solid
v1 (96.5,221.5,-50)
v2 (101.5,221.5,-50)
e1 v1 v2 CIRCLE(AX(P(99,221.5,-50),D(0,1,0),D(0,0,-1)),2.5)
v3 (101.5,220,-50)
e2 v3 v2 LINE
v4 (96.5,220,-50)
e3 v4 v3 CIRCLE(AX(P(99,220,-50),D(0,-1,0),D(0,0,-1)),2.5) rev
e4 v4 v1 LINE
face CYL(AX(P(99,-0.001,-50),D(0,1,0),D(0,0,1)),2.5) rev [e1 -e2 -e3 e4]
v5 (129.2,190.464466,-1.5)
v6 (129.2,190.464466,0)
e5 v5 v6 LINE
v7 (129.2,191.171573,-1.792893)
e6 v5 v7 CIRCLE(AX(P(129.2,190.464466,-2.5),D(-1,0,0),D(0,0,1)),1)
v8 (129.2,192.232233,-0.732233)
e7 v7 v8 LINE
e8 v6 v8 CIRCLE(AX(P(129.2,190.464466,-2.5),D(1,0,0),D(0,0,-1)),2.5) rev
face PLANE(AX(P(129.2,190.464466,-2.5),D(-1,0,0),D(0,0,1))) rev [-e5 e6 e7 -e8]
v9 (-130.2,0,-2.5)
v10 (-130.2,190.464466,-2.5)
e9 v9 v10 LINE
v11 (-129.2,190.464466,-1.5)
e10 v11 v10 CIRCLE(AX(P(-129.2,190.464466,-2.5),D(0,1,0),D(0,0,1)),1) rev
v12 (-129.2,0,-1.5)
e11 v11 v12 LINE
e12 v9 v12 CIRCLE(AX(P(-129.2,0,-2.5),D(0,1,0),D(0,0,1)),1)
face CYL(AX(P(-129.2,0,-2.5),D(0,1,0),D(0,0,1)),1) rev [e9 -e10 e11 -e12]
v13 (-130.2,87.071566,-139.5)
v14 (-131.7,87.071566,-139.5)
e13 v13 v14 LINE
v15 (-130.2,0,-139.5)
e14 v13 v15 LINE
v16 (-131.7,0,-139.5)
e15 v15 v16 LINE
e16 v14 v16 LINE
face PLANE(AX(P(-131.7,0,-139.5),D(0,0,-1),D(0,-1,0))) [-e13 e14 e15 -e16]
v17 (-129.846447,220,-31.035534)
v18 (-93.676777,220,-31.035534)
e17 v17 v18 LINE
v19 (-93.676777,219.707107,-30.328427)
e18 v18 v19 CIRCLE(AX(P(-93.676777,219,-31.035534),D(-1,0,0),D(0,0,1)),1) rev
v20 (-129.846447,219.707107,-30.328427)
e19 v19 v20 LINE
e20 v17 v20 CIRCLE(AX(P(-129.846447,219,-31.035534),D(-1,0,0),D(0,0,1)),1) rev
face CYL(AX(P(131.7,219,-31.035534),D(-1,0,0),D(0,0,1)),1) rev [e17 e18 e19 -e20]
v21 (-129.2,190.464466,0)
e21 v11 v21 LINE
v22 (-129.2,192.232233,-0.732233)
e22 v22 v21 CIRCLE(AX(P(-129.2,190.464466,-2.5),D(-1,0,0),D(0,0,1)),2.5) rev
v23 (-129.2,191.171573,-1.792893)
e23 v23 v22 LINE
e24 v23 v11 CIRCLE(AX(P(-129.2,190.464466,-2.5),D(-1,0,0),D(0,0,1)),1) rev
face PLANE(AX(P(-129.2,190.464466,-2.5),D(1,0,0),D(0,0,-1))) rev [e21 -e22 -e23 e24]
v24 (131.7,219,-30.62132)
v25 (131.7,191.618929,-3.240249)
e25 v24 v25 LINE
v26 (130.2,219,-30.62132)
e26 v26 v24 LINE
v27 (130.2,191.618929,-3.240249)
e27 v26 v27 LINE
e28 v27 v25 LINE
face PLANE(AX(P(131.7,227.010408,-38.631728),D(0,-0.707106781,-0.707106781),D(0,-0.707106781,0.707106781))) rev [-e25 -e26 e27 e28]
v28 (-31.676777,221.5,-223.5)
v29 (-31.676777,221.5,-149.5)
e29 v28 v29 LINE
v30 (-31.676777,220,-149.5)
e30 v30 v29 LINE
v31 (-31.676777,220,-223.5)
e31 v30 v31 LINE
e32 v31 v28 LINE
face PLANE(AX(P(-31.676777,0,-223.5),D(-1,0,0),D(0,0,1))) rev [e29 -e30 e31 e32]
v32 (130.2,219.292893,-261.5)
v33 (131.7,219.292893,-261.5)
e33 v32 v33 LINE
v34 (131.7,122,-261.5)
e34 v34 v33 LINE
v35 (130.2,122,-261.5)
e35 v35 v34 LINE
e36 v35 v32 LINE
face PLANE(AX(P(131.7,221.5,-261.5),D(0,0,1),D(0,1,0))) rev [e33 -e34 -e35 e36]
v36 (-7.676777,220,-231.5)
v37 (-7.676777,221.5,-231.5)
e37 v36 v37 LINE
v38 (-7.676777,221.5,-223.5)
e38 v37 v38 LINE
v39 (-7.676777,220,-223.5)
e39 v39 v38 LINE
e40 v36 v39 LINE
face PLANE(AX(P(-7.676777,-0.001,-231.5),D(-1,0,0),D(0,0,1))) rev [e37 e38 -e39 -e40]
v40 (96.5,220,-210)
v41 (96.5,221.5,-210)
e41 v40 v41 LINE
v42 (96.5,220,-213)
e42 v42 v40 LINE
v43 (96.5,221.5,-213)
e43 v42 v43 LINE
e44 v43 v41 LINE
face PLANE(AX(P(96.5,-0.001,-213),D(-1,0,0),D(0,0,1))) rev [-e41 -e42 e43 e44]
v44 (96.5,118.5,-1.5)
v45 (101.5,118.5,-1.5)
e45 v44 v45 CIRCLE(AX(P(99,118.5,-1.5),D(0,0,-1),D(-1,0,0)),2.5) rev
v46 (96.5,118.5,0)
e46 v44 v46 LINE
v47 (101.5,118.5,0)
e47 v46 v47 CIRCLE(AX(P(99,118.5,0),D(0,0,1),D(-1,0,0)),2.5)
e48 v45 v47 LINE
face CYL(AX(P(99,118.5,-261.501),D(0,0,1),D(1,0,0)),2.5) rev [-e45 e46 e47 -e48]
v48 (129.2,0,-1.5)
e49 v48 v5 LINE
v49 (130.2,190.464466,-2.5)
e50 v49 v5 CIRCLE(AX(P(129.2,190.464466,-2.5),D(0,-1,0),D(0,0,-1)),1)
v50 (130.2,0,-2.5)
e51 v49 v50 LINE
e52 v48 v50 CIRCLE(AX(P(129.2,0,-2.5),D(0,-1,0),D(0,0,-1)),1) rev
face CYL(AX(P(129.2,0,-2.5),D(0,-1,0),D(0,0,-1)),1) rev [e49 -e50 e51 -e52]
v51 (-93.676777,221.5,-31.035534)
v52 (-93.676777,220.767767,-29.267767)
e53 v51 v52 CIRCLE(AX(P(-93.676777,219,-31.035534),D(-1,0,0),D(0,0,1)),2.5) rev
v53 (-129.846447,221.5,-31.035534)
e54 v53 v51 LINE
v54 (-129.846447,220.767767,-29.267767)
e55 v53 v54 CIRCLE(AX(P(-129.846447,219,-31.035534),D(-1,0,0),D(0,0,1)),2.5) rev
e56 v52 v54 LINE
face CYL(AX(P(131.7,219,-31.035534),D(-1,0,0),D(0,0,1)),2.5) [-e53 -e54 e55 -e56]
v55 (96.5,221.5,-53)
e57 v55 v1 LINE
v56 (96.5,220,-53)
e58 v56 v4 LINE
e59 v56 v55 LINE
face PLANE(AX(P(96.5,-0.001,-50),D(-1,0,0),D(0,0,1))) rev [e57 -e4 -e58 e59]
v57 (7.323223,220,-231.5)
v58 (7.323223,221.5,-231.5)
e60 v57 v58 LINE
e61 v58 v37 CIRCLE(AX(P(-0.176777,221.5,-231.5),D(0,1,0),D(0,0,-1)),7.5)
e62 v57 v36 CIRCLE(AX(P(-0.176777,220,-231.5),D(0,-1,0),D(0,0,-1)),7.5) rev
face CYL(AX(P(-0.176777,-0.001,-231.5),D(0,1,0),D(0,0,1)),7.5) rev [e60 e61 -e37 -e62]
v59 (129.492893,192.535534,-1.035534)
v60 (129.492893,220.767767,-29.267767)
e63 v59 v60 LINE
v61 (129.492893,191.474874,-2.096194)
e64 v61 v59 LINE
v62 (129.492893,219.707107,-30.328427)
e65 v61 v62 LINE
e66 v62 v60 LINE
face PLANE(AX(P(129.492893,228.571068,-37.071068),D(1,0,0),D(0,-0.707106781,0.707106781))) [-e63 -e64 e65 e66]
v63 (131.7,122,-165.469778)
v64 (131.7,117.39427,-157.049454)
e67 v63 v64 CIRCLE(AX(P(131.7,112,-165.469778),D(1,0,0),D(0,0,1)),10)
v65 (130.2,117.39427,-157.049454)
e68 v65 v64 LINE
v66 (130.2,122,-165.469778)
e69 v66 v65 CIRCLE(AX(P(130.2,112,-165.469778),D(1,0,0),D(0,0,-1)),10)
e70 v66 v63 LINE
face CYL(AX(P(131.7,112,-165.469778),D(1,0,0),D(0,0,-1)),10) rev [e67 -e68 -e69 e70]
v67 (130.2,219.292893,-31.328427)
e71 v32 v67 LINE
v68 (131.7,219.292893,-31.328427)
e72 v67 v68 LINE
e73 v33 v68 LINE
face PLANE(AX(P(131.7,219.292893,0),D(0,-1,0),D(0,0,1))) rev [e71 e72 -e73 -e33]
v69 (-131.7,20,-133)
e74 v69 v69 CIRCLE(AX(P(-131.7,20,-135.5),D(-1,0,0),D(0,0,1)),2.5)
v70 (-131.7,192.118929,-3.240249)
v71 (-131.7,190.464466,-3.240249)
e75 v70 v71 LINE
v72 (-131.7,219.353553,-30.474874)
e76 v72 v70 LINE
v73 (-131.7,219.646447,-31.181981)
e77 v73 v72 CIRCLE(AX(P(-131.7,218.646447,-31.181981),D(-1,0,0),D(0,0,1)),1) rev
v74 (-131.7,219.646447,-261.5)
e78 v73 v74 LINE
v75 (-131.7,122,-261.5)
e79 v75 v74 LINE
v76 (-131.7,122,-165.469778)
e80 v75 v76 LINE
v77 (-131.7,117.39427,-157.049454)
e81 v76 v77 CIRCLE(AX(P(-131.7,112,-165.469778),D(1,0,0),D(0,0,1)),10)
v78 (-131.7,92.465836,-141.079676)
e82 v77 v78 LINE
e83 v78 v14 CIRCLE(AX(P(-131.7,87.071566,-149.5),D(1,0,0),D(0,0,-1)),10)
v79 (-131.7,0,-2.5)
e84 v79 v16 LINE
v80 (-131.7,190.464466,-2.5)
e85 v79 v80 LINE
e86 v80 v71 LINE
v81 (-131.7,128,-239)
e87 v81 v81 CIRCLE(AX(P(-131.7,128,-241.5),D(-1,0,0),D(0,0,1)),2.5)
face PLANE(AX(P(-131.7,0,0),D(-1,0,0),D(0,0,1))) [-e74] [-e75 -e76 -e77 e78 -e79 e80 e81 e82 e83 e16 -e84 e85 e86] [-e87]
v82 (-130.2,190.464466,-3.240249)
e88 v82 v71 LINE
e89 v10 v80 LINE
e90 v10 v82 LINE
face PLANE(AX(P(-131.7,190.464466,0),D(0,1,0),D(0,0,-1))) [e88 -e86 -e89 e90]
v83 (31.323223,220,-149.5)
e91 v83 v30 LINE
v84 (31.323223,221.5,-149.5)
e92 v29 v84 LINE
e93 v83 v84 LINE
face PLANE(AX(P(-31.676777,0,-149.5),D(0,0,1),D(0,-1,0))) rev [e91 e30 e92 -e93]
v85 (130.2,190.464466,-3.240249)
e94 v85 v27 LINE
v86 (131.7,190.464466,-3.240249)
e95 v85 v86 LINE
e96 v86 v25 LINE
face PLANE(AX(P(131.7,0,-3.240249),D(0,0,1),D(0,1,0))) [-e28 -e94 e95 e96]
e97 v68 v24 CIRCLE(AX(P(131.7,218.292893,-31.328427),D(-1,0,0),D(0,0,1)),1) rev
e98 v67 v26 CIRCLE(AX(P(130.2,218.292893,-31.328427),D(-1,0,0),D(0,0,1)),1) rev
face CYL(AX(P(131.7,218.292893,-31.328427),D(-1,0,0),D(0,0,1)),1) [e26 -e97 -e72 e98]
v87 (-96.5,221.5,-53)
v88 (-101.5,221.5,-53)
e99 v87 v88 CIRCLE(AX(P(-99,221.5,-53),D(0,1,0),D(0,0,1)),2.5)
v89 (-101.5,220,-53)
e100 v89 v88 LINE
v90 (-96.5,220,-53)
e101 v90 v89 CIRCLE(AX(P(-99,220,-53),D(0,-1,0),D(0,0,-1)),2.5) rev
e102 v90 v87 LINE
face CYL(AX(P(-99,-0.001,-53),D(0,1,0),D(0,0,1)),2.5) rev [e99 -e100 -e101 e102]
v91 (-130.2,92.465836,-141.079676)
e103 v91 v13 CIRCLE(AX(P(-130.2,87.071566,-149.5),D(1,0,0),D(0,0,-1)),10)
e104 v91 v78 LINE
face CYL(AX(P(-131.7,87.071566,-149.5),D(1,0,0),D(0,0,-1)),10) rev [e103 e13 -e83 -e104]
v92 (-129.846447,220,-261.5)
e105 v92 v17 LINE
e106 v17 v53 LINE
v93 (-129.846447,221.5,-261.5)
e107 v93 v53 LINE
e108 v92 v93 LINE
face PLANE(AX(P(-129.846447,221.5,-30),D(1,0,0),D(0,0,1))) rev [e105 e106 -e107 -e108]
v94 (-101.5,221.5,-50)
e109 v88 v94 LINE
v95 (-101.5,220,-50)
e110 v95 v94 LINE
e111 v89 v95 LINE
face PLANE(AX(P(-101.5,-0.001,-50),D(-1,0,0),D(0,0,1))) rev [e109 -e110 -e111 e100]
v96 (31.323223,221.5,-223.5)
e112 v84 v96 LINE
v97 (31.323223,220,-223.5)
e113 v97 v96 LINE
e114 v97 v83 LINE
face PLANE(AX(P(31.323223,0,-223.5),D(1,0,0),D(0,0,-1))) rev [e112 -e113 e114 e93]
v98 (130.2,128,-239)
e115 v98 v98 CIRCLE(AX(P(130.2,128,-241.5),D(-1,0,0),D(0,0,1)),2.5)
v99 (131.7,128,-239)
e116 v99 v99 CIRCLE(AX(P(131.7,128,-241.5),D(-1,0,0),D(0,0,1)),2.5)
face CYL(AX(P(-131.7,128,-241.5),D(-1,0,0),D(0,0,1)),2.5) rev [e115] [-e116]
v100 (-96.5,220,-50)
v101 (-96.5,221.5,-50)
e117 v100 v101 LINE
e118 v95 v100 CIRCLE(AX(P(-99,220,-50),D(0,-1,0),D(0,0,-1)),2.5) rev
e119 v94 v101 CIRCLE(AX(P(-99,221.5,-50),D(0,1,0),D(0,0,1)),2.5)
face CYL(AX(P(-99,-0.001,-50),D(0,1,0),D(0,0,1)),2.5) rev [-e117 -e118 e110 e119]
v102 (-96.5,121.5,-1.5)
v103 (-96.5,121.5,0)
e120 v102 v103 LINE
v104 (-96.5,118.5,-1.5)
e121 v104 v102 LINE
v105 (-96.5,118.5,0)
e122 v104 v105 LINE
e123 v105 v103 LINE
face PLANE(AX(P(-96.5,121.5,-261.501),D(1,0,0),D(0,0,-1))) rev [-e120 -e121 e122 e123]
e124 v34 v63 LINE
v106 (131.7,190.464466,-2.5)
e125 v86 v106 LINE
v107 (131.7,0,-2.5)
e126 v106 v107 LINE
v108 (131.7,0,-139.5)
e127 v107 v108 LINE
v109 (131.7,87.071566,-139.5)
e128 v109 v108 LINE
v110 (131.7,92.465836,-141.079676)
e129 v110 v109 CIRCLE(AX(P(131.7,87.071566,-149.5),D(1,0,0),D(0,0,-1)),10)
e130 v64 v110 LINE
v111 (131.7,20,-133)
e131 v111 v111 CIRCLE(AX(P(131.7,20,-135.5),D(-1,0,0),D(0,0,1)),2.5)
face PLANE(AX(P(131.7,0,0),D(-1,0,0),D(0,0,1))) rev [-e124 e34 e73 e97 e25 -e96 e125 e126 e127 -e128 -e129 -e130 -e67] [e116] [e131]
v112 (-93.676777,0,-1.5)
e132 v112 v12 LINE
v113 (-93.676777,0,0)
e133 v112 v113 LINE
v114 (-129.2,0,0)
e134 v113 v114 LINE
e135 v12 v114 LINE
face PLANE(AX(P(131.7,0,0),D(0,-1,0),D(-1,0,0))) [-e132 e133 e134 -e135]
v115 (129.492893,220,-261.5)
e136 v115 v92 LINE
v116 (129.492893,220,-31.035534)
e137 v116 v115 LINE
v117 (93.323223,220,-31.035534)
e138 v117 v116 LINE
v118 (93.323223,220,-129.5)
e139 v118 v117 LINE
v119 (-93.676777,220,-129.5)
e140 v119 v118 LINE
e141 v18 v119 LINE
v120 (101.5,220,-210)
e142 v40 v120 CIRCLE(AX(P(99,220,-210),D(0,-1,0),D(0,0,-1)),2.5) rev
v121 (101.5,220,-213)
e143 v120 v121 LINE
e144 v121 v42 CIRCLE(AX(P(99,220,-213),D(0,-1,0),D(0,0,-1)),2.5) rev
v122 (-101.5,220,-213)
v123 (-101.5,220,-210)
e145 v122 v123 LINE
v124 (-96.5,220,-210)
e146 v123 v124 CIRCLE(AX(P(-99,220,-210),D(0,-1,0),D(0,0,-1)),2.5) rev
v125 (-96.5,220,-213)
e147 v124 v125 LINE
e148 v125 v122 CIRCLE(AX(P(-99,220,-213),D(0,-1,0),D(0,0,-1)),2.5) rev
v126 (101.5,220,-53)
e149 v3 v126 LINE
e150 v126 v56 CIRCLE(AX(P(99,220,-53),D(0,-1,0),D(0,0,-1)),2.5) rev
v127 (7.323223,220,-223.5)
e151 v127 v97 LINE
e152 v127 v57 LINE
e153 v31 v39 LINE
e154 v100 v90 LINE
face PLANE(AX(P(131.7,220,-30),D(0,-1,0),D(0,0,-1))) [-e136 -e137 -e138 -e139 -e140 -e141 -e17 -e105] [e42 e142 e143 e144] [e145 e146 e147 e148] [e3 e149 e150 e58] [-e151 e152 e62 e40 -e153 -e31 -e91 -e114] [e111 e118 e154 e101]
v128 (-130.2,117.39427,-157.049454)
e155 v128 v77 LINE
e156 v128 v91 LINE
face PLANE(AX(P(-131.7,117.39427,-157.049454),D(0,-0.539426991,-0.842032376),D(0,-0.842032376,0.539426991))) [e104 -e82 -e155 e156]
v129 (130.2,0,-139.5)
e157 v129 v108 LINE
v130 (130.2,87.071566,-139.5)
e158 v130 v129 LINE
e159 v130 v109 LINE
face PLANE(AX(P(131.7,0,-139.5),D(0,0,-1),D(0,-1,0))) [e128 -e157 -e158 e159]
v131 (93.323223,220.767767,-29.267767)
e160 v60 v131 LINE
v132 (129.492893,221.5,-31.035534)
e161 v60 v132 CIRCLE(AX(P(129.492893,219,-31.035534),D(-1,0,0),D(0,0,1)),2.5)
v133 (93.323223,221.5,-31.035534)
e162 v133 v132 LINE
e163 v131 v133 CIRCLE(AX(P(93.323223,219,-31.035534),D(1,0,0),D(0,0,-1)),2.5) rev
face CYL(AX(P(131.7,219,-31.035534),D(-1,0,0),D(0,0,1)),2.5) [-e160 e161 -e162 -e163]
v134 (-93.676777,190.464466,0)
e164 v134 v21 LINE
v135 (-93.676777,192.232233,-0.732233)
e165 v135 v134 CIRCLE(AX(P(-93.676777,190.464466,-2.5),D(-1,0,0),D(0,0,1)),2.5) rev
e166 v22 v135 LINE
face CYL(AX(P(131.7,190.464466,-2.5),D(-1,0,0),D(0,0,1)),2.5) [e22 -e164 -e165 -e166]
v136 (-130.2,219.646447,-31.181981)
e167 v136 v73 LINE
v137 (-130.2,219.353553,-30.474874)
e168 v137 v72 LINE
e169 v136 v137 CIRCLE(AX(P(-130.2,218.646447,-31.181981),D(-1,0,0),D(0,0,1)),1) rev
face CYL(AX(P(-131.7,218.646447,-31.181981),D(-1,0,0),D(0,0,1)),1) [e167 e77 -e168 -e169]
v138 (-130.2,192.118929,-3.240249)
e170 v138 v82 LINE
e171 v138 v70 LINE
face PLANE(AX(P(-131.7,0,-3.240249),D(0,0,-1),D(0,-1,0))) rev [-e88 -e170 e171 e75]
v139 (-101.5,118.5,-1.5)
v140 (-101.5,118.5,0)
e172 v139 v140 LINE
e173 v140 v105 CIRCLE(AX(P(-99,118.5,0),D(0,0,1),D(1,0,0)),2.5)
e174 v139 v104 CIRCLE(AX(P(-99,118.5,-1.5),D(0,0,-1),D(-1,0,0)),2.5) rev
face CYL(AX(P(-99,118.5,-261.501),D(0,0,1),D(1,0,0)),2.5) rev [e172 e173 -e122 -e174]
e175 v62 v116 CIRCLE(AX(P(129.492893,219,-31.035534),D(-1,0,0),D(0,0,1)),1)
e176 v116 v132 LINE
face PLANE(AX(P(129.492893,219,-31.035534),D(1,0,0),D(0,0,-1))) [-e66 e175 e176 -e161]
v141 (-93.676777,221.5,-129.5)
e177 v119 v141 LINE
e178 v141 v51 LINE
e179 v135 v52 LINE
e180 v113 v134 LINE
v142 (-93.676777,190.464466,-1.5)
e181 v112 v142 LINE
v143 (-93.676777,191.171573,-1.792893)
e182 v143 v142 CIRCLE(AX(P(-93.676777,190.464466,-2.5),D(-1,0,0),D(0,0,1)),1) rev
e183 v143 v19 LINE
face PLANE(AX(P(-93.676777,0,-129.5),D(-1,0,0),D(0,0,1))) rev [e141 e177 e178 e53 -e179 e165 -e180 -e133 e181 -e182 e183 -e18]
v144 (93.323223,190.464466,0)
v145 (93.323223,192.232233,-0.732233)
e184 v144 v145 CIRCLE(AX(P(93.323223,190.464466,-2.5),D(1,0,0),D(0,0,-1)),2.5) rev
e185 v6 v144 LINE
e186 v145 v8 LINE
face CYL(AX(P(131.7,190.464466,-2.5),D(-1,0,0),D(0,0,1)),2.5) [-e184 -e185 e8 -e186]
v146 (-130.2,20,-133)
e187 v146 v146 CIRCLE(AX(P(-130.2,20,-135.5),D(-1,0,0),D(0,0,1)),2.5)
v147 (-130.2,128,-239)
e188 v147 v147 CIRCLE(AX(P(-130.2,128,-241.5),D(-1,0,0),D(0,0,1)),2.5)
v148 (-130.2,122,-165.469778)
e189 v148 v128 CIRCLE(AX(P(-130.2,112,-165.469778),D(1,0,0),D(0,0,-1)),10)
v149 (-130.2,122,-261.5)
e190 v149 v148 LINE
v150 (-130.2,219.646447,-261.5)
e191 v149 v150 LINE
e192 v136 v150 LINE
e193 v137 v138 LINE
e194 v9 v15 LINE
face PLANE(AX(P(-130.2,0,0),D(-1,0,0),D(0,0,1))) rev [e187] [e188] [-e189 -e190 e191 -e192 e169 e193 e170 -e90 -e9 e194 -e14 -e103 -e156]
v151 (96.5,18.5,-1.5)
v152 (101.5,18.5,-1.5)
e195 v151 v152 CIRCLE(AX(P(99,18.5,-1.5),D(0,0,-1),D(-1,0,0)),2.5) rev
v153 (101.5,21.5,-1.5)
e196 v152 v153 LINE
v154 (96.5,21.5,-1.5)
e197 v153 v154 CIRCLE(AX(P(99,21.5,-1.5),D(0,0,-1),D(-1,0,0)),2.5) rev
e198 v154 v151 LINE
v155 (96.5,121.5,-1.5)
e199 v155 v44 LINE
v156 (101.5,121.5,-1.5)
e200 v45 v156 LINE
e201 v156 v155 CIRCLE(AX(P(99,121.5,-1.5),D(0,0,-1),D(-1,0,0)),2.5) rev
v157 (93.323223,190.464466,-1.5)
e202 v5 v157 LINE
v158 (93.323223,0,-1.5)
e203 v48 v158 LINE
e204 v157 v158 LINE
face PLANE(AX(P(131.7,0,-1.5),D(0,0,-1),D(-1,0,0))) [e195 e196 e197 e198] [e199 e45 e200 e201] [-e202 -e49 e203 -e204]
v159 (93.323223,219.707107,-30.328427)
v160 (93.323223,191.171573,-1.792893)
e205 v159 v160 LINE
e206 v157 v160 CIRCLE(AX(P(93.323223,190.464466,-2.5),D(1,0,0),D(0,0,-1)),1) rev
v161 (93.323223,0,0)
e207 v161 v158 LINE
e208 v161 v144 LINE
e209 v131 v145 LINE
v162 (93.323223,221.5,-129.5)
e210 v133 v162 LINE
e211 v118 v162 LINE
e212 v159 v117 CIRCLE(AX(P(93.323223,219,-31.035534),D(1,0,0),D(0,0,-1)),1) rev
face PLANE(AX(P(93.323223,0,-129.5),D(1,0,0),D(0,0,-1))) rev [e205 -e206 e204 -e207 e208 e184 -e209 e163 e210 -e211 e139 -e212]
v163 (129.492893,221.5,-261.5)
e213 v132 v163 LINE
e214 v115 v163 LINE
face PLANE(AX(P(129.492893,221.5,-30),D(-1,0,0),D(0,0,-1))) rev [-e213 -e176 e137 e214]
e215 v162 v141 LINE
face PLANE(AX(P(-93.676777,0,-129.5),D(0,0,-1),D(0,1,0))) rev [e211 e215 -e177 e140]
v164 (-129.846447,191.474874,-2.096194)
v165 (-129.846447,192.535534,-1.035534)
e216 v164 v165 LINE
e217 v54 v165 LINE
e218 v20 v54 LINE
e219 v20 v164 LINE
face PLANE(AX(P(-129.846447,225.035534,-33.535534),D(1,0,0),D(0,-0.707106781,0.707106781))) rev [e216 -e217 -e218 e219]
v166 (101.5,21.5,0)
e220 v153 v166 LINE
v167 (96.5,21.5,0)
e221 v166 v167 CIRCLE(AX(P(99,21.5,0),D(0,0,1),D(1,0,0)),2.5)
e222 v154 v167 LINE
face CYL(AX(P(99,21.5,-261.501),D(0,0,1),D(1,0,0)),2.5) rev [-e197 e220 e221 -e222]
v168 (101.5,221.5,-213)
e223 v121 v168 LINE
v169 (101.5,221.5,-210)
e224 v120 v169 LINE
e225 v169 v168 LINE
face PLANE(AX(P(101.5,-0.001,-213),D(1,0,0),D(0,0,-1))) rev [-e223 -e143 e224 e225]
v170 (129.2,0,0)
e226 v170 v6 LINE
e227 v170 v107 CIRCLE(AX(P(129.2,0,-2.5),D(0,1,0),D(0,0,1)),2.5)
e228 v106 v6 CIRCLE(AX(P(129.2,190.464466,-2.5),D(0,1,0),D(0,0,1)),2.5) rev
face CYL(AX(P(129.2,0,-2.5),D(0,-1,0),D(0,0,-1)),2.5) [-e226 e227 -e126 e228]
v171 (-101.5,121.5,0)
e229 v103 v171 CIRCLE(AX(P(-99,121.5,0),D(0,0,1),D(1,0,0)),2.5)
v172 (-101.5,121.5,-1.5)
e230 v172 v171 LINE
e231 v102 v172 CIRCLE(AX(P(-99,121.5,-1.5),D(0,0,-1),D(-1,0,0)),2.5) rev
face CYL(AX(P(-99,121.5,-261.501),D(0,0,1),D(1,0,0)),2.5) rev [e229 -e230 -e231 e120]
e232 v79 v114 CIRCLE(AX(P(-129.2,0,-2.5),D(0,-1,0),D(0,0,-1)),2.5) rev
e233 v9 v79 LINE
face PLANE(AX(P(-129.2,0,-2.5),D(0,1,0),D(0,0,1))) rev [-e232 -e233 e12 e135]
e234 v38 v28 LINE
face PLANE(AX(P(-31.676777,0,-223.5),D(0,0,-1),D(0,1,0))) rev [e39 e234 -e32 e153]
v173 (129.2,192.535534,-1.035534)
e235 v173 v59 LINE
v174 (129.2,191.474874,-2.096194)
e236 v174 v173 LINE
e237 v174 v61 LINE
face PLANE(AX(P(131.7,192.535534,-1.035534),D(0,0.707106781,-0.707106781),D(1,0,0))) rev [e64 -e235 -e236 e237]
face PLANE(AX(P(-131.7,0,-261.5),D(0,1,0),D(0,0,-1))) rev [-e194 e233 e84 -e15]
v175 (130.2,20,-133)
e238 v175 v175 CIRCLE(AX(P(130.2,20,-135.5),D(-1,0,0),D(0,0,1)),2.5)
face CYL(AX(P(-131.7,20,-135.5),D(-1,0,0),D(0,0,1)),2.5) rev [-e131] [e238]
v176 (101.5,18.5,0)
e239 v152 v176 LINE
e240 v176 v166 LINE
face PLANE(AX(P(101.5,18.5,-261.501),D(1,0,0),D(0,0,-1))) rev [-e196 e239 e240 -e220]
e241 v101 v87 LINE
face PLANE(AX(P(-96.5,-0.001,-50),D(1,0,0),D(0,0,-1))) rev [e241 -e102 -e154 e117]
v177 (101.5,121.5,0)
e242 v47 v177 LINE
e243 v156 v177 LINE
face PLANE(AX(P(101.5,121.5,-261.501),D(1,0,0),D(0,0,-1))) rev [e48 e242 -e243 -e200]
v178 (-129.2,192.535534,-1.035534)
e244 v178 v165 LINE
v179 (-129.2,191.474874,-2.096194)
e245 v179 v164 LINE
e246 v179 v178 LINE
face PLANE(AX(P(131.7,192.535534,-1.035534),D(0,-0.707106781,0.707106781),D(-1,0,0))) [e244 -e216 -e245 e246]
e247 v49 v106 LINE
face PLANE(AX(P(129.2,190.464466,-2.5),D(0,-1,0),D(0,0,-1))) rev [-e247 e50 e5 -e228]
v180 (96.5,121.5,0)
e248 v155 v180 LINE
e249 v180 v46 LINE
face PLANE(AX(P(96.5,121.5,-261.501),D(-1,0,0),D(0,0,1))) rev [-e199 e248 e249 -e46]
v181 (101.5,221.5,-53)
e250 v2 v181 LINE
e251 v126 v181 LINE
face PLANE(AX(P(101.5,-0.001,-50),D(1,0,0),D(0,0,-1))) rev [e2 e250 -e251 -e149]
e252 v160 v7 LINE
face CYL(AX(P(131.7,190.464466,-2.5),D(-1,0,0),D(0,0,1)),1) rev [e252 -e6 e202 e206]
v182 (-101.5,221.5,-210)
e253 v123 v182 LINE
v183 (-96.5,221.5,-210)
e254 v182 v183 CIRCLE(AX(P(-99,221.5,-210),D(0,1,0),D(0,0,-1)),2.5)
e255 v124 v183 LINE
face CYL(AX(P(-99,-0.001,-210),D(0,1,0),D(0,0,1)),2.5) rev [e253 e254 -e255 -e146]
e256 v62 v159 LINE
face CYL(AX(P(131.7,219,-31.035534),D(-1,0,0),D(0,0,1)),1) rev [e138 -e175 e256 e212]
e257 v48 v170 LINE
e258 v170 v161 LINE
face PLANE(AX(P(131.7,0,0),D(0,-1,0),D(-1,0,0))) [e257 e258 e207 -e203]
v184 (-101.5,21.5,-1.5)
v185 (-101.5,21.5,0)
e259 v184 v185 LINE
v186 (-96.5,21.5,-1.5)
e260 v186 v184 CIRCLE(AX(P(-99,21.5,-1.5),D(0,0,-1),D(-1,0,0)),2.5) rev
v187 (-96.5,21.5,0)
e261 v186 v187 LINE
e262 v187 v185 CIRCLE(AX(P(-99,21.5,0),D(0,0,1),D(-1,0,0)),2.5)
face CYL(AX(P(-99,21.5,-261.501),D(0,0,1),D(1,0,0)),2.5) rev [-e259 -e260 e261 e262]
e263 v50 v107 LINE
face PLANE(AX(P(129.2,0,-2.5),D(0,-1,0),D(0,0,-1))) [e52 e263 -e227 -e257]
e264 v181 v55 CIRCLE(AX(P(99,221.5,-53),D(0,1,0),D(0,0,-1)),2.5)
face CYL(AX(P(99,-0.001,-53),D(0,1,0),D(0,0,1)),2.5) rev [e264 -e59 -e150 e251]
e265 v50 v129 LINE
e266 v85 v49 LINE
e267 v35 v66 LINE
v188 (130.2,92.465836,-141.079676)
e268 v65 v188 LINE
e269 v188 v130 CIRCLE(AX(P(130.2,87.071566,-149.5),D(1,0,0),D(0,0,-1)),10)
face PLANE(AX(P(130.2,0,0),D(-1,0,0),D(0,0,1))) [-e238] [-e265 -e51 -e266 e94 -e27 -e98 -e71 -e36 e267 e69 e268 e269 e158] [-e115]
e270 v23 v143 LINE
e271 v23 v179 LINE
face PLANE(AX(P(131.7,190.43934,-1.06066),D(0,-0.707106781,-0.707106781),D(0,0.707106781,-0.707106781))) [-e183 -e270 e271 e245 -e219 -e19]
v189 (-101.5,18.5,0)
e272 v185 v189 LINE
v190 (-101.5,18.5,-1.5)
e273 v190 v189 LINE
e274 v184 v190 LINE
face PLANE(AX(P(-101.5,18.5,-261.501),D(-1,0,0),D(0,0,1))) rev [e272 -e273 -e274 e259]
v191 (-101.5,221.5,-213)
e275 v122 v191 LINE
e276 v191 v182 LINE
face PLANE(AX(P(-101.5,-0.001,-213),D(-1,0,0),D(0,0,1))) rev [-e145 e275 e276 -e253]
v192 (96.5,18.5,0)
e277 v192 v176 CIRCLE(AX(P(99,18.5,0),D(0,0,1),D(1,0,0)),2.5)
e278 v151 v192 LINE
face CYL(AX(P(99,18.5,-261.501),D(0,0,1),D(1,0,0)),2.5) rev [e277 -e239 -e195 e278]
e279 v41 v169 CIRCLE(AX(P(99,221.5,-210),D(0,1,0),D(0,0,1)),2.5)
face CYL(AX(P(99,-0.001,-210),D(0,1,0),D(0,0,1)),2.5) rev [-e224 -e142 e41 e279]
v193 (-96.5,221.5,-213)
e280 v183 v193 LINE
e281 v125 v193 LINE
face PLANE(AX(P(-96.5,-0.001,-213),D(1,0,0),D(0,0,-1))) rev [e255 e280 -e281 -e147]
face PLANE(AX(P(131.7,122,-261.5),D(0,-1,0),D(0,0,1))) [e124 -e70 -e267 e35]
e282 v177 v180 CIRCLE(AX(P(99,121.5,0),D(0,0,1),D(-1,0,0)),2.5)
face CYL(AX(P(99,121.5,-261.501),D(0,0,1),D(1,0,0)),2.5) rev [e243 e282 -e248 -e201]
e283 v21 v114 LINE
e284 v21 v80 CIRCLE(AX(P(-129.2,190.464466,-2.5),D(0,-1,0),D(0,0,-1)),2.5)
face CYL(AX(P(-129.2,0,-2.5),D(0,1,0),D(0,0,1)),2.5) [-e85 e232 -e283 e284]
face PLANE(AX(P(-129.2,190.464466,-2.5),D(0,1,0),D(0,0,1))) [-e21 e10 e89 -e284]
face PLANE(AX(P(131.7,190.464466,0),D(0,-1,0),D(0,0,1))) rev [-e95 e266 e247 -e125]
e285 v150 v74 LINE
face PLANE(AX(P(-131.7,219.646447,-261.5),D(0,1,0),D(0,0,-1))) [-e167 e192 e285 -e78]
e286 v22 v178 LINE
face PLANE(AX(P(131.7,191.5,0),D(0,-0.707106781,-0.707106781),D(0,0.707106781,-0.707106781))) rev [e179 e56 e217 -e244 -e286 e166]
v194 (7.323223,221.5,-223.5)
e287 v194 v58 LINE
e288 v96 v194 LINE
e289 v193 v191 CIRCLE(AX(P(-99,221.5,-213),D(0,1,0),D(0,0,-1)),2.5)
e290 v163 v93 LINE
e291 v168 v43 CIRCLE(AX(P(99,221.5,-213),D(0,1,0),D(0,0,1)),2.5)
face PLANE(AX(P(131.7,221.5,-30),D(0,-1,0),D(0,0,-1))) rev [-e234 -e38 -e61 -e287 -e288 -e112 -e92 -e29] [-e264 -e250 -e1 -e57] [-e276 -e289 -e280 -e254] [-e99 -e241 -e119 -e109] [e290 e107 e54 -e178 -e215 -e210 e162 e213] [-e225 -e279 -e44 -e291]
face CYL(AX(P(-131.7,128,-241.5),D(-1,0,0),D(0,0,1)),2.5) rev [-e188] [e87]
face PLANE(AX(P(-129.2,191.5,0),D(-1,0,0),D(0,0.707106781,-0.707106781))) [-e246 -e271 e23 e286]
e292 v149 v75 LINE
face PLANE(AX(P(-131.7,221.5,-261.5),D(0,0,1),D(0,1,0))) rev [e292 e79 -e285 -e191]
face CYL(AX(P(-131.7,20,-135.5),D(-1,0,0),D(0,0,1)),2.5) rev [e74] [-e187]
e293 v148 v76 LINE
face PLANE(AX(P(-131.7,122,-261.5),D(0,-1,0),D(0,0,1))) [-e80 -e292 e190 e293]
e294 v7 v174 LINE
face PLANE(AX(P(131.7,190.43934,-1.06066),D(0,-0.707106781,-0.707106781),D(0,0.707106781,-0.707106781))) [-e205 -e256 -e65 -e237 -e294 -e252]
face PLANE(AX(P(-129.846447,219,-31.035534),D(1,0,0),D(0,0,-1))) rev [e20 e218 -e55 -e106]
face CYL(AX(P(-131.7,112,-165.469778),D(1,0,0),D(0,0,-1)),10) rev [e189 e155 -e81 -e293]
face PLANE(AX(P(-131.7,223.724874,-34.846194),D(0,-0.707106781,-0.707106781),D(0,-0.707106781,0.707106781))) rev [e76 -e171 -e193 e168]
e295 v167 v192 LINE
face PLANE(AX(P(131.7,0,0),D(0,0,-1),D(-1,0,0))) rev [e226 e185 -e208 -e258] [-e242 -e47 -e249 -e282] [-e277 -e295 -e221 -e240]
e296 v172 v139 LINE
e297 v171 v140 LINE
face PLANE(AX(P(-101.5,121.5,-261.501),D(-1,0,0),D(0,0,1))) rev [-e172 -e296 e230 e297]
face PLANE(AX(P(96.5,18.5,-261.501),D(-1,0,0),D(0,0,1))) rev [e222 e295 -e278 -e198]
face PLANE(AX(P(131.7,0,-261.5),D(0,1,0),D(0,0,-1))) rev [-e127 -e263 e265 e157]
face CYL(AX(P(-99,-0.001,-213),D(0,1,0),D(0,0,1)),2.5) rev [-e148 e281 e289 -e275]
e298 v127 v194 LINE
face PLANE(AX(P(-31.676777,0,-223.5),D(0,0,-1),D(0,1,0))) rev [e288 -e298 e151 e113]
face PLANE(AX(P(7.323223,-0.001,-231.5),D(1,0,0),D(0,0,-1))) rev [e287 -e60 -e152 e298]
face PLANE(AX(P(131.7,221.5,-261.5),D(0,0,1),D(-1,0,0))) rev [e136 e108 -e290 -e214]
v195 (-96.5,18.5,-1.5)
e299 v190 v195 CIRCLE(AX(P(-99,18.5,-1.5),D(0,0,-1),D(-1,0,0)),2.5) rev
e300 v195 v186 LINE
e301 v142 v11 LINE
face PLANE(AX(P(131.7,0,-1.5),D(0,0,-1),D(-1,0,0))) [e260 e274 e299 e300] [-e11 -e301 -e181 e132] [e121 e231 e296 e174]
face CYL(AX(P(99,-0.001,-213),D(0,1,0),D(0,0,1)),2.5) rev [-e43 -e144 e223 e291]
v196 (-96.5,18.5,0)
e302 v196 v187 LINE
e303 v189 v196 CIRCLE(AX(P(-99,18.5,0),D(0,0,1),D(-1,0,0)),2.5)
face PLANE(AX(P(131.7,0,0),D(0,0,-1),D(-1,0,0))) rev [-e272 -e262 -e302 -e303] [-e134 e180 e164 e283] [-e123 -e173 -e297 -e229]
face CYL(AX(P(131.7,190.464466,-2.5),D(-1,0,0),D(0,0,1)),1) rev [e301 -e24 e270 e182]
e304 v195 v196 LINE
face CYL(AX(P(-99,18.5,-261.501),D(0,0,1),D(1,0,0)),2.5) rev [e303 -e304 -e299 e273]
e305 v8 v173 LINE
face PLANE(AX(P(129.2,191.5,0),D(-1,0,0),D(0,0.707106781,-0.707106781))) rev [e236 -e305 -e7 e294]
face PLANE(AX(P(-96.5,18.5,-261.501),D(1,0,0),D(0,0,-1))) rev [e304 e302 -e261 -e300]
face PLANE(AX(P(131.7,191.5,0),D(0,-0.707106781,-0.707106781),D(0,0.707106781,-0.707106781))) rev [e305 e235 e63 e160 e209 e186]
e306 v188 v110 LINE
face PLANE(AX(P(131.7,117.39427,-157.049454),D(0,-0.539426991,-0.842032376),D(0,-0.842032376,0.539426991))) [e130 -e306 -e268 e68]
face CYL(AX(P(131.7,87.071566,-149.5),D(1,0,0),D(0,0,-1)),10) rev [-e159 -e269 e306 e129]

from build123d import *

# Parameters (mm, degrees)
EXTRUDE_1_DEPTH       = 131.7
CUT_EXTRUDE_1_DEPTH   = 433.231488904
SHEET_START           = -129.846446609
SHEET_METAL_1_DEPTH   = 259.339339828
SHEET_START_2         = 129.492893219
SHEET_METAL_1_2_DEPTH = 3.507106781
SHEET_START_3         = -133
SHEET_METAL_1_3_DEPTH = 3.153553391
SHEET_START_4         = -130.2
SHEET_METAL_1_4_DEPTH = 1
SHEET_START_5         = 129.2
SHEET_METAL_1_5_DEPTH = 0.292893219
SHEET_START_6         = -1
SHEET_METAL_1_6_DEPTH = 220.292893219
SHEET_METAL_1_7_DEPTH = 190.464466094
SKETCH_5_W            = 187
SKETCH_5_H            = 129.5
SKETCH_5_W_2          = 63
SKETCH_5_H_2          = 74
CUT_EXTRUDE_2_DEPTH   = 368.136745641
CUT_EXTRUDE_3_REACH   = 369.137
CUT_EXTRUDE_4_REACH   = 369.137
CUT_EXTRUDE_5_REACH   = 369.137
HOLE_WIZARD_M4_1_D    = 5


with BuildPart() as part:
    # Sketch 1 → 凸台-拉伸1 (new, symmetric)
    with BuildSketch(Plane(origin=(0, 0, 0), x_dir=(0, 0, -1), z_dir=(1, 0, 0))):
        Polygon((0, 0), (0, 191.5), (30, 221.5), (261.5, 221.5), (261.5, 0), align=None)
    extrude(amount=EXTRUDE_1_DEPTH, both=True)

    # 草图4 → 切除-拉伸1 (cut, through all)
    with BuildSketch(Plane(origin=(131.7, 0, 0), x_dir=(0, 0, -1), z_dir=(1, 0, 0))):
        with BuildLine():
            Line((261.5, 0), (139.5, 0))
            Line((139.5, 0), (139.5, 87.07156618))
            ThreePointArc((139.5, 87.07156618), (139.90304117, 89.881972061), (141.079676243, 92.465836087))
            Line((141.079676243, 92.465836087), (157.049454159, 117.394269907))
            ThreePointArc((157.049454159, 117.394269907), (160.670960305, 120.773331724), (165.469777916, 122))
            Line((165.469777916, 122), (261.5, 122))
            Line((261.5, 122), (261.5, 0))
        make_face()
    extrude(amount=-CUT_EXTRUDE_1_DEPTH, mode=Mode.SUBTRACT)

    # Sheet Metal 1: read off the stored shape, not the designer's step
    # Sheet Metal 1 outline → Sheet Metal 1 (cut)
    with BuildSketch(Plane.YZ.offset(SHEET_START)):
        with BuildLine():
            Line((220, -261.5), (220, -31.035533906))
            ThreePointArc((220, -31.035533906), (219.923879533, -30.652850474), (219.707106781, -30.328427125))
            Line((219.707106781, -30.328427125), (191.171572875, -1.792893219))
            ThreePointArc((191.171572875, -1.792893219), (190.847149526, -1.576120467), (190.464466094, -1.5))
            Line((190.464466094, -1.5), (0, -1.5))
            Line((0, -1.5), (0, -139.5))
            Line((0, -139.5), (87.07156618, -139.5))
            ThreePointArc((87.07156618, -139.5), (89.881972061, -139.90304117), (92.465836087, -141.079676243))
            Line((92.465836087, -141.079676243), (117.394269907, -157.049454159))
            ThreePointArc((117.394269907, -157.049454159), (120.773331724, -160.670960305), (122, -165.469777916))
            Line((122, -165.469777916), (122, -261.5))
            Line((122, -261.5), (220, -261.5))
        make_face()
        with BuildLine():
            ThreePointArc((220.767766953, -29.267766953), (221.309698831, -30.078825325), (221.5, -31.035533906))
            Line((221.5, -31.035533906), (221.5, -30))
            Line((221.5, -30), (220.767766953, -29.267766953))
        make_face()
        with BuildLine():
            Line((191.5, 0), (190.464466094, 0))
            ThreePointArc((190.464466094, 0), (191.421174675, -0.190301169), (192.232233047, -0.732233047))
            Line((192.232233047, -0.732233047), (191.5, 0))
        make_face()
    extrude(amount=SHEET_METAL_1_DEPTH, mode=Mode.SUBTRACT)

    # Sheet Metal 1 2 outline → Sheet Metal 1 2 (cut)
    with BuildSketch(Plane.YZ.offset(SHEET_START_2)):
        with BuildLine():
            ThreePointArc((219, -30.621320344), (219.216772751, -30.945743693), (219.292893219, -31.328427125))
            Line((219.292893219, -31.328427125), (219.292893219, -261.5))
            Line((219.292893219, -261.5), (221.5, -261.5))
            Line((221.5, -261.5), (221.5, -30))
            Line((221.5, -30), (191.5, 0))
            Line((191.5, 0), (190.464466094, 0))
            Line((190.464466094, 0), (190.464466094, -3.240249))
            Line((190.464466094, -3.240249), (191.618928656, -3.240249))
            Line((191.618928656, -3.240249), (219, -30.621320344))
        make_face()
    extrude(amount=SHEET_METAL_1_2_DEPTH, mode=Mode.SUBTRACT)

    # Sheet Metal 1 3 outline → Sheet Metal 1 3 (cut)
    with BuildSketch(Plane.YZ.offset(SHEET_START_3)):
        with BuildLine():
            Line((219.646446609, -31.181980515), (219.646446609, -261.5))
            Line((219.646446609, -261.5), (221.5, -261.5))
            Line((221.5, -261.5), (221.5, -30))
            Line((221.5, -30), (191.5, 0))
            Line((191.5, 0), (190.464466094, 0))
            Line((190.464466094, 0), (190.464466094, -3.240249))
            Line((190.464466094, -3.240249), (192.118928656, -3.240249))
            Line((192.118928656, -3.240249), (219.353553391, -30.474873734))
            ThreePointArc((219.353553391, -30.474873734), (219.570326142, -30.799297083), (219.646446609, -31.181980515))
        make_face()
    extrude(amount=SHEET_METAL_1_3_DEPTH, mode=Mode.SUBTRACT)

    # Sheet Metal 1 4 outline → Sheet Metal 1 4 (cut)
    with BuildSketch(Plane.YZ.offset(SHEET_START_4)):
        with BuildLine():
            ThreePointArc((219, -30.621320344), (219.216772751, -30.945743693), (219.292893219, -31.328427125))
            Line((219.292893219, -31.328427125), (219.292893219, -261.5))
            Line((219.292893219, -261.5), (219.646446609, -261.5))
            Line((219.646446609, -261.5), (219.646446609, -31.181980515))
            ThreePointArc((219.646446609, -31.181980515), (219.570326142, -30.799297083), (219.353553391, -30.474873734))
            Line((219.353553391, -30.474873734), (192.118928656, -3.240249))
            Line((192.118928656, -3.240249), (191.618928656, -3.240249))
            Line((191.618928656, -3.240249), (219, -30.621320344))
        make_face()
        with BuildLine():
            Line((190.464466094, 0), (190.464466094, -1.5))
            ThreePointArc((190.464466094, -1.5), (190.847149526, -1.576120467), (191.171572875, -1.792893219))
            Line((191.171572875, -1.792893219), (191.474873734, -2.096194078))
            Line((191.474873734, -2.096194078), (192.535533906, -1.035533906))
            Line((192.535533906, -1.035533906), (192.232233047, -0.732233047))
            ThreePointArc((192.232233047, -0.732233047), (191.421174675, -0.190301169), (190.464466094, 0))
        make_face()
    extrude(amount=SHEET_METAL_1_4_DEPTH, mode=Mode.SUBTRACT)

    # Sheet Metal 1 5 outline → Sheet Metal 1 5 (cut)
    with BuildSketch(Plane.YZ.offset(SHEET_START_5)):
        with BuildLine():
            Line((190.464466094, 0), (190.464466094, -1.5))
            ThreePointArc((190.464466094, -1.5), (190.847149526, -1.576120467), (191.171572875, -1.792893219))
            Line((191.171572875, -1.792893219), (191.474873734, -2.096194078))
            Line((191.474873734, -2.096194078), (192.535533906, -1.035533906))
            Line((192.535533906, -1.035533906), (192.232233047, -0.732233047))
            ThreePointArc((192.232233047, -0.732233047), (191.421174675, -0.190301169), (190.464466094, 0))
        make_face()
    extrude(amount=SHEET_METAL_1_5_DEPTH, mode=Mode.SUBTRACT)

    # Sheet Metal 1 6 outline → Sheet Metal 1 6 (cut)
    with BuildSketch(Plane(origin=(0, 0, 0), x_dir=(1, 0, 0), z_dir=(0, 1, 0)).offset(SHEET_START_6)):
        with BuildLine():
            Line((131.7, 0), (131.7, 2.5))
            ThreePointArc((131.7, 2.5), (130.967766953, 0.732233047), (129.2, 0))
            Line((129.2, 0), (131.7, 0))
        make_face()
        with BuildLine():
            Line((-131.7, 0), (-129.2, 0))
            ThreePointArc((-129.2, 0), (-130.967766953, 0.732233047), (-131.7, 2.5))
            Line((-131.7, 2.5), (-131.7, 0))
        make_face()
        with BuildLine():
            ThreePointArc((129.492893219, 1.543854843), (130.004019035, 1.905396443), (130.2, 2.5))
            Line((130.2, 2.5), (130.2, 261.5))
            Line((130.2, 261.5), (129.492893219, 261.5))
            Line((129.492893219, 261.5), (129.492893219, 1.543854843))
        make_face()
        with BuildLine():
            Line((-129.846446609, 1.737040774), (-129.846446609, 261.5))
            Line((-129.846446609, 261.5), (-130.2, 261.5))
            Line((-130.2, 261.5), (-130.2, 2.5))
            ThreePointArc((-130.2, 2.5), (-130.10731654, 2.079551792), (-129.846446609, 1.737040774))
        make_face()
    extrude(amount=SHEET_METAL_1_6_DEPTH, mode=Mode.SUBTRACT)

    # Sheet Metal 1 7 outline → Sheet Metal 1 7 (add)
    with BuildSketch(Plane(origin=(0, 0, 0), x_dir=(1, 0, 0), z_dir=(0, 1, 0))):
        with BuildLine():
            Line((129.492893219, 1.5), (129.492893219, 1.543854843))
            ThreePointArc((129.492893219, 1.543854843), (129.348079105, 1.51102448), (129.2, 1.5))
            Line((129.2, 1.5), (129.492893219, 1.5))
        make_face()
        with BuildLine():
            Line((-129.846446609, 1.5), (-129.2, 1.5))
            ThreePointArc((-129.2, 1.5), (-129.5442679, 1.561128543), (-129.846446609, 1.737040774))
            Line((-129.846446609, 1.737040774), (-129.846446609, 1.5))
        make_face()
    extrude(amount=SHEET_METAL_1_7_DEPTH)

    # 草图5 → 切除-拉伸2 (cut, through all)
    with BuildSketch(Plane(origin=(0, 221.5, 0), x_dir=(1, 0, 0), z_dir=(0, 1, 0))):
        with Locations((-0.176776695, 64.75)):
            Rectangle(SKETCH_5_W, SKETCH_5_H)
        with Locations((-0.176776695, 186.5)):
            Rectangle(SKETCH_5_W_2, SKETCH_5_H_2)
    extrude(amount=-CUT_EXTRUDE_2_DEPTH, mode=Mode.SUBTRACT)

    # 草图6 → 切除-拉伸3 (cut, up to next)
    with BuildSketch(Plane(origin=(0, 221.5, 0), x_dir=(1, 0, 0), z_dir=(0, 1, 0)), mode=Mode.PRIVATE) as cut_extrude_3_sk1:
        with BuildLine():
            Line((-7.676776695, 231.5), (-7.676776695, 223.5))
            Line((-7.676776695, 223.5), (7.323223305, 223.5))
            Line((7.323223305, 223.5), (7.323223305, 231.5))
            ThreePointArc((7.323223305, 231.5), (-0.176776695, 239), (-7.676776695, 231.5))
        make_face()
    cut_extrude_3_tool1 = extrude(cut_extrude_3_sk1.sketch, amount=-CUT_EXTRUDE_3_REACH, mode=Mode.PRIVATE) & part.part
    add(cut_extrude_3_tool1.solids().sort_by_distance((-0.176777, 221.5, -230.54611))[0], mode=Mode.SUBTRACT)

    # 草图7 → 切除-拉伸4 (cut, up to next)
    with BuildSketch(Plane(origin=(0, 221.5, 0), x_dir=(1, 0, 0), z_dir=(0, 1, 0)), mode=Mode.PRIVATE) as cut_extrude_4_sk1:
        with BuildLine():
            Line((101.5, 213), (101.5, 210))
            ThreePointArc((101.5, 210), (99, 207.5), (96.5, 210))
            Line((96.5, 210), (96.5, 213))
            ThreePointArc((96.5, 213), (99, 215.5), (101.5, 213))
        make_face()
    cut_extrude_4_tool1 = extrude(cut_extrude_4_sk1.sketch, amount=-CUT_EXTRUDE_4_REACH, mode=Mode.PRIVATE) & part.part
    # 草图7 → 切除-拉伸4 (cut, up to next)
    with BuildSketch(Plane(origin=(0, 221.5, 0), x_dir=(1, 0, 0), z_dir=(0, 1, 0)), mode=Mode.PRIVATE) as cut_extrude_4_sk2:
        with BuildLine():
            Line((101.5, 50), (101.5, 53))
            ThreePointArc((101.5, 53), (99, 55.5), (96.5, 53))
            Line((96.5, 53), (96.5, 50))
            ThreePointArc((96.5, 50), (99, 47.5), (101.5, 50))
        make_face()
    cut_extrude_4_tool2 = extrude(cut_extrude_4_sk2.sketch, amount=-CUT_EXTRUDE_4_REACH, mode=Mode.PRIVATE) & part.part
    # 草图7 → 切除-拉伸4 (cut, up to next)
    with BuildSketch(Plane(origin=(0, 221.5, 0), x_dir=(1, 0, 0), z_dir=(0, 1, 0)), mode=Mode.PRIVATE) as cut_extrude_4_sk3:
        with BuildLine():
            Line((-101.5, 213), (-101.5, 210))
            ThreePointArc((-101.5, 210), (-99, 207.5), (-96.5, 210))
            Line((-96.5, 210), (-96.5, 213))
            ThreePointArc((-96.5, 213), (-99, 215.5), (-101.5, 213))
        make_face()
    cut_extrude_4_tool3 = extrude(cut_extrude_4_sk3.sketch, amount=-CUT_EXTRUDE_4_REACH, mode=Mode.PRIVATE) & part.part
    # 草图7 → 切除-拉伸4 (cut, up to next)
    with BuildSketch(Plane(origin=(0, 221.5, 0), x_dir=(1, 0, 0), z_dir=(0, 1, 0)), mode=Mode.PRIVATE) as cut_extrude_4_sk4:
        with BuildLine():
            Line((-101.5, 50), (-101.5, 53))
            ThreePointArc((-101.5, 53), (-99, 55.5), (-96.5, 53))
            Line((-96.5, 53), (-96.5, 50))
            ThreePointArc((-96.5, 50), (-99, 47.5), (-101.5, 50))
        make_face()
    cut_extrude_4_tool4 = extrude(cut_extrude_4_sk4.sketch, amount=-CUT_EXTRUDE_4_REACH, mode=Mode.PRIVATE) & part.part
    add(cut_extrude_4_tool1.solids().sort_by_distance((99, 221.5, -211.5))[0], mode=Mode.SUBTRACT)
    add(cut_extrude_4_tool2.solids().sort_by_distance((99, 221.5, -51.5))[0], mode=Mode.SUBTRACT)
    add(cut_extrude_4_tool3.solids().sort_by_distance((-99, 221.5, -211.5))[0], mode=Mode.SUBTRACT)
    add(cut_extrude_4_tool4.solids().sort_by_distance((-99, 221.5, -51.5))[0], mode=Mode.SUBTRACT)

    # 草图8 → 切除-拉伸5 (cut, up to next)
    with BuildSketch(Plane.XY, mode=Mode.PRIVATE) as cut_extrude_5_sk1:
        with BuildLine():
            Line((-96.5, 121.5), (-96.5, 118.5))
            ThreePointArc((-96.5, 118.5), (-99, 116), (-101.5, 118.5))
            Line((-101.5, 118.5), (-101.5, 121.5))
            ThreePointArc((-101.5, 121.5), (-99, 124), (-96.5, 121.5))
        make_face()
    cut_extrude_5_tool1 = extrude(cut_extrude_5_sk1.sketch, amount=-CUT_EXTRUDE_5_REACH, mode=Mode.PRIVATE) & part.part
    # 草图8 → 切除-拉伸5 (cut, up to next)
    with BuildSketch(Plane.XY, mode=Mode.PRIVATE) as cut_extrude_5_sk2:
        with BuildLine():
            Line((96.5, 121.5), (96.5, 118.5))
            ThreePointArc((96.5, 118.5), (99, 116), (101.5, 118.5))
            Line((101.5, 118.5), (101.5, 121.5))
            ThreePointArc((101.5, 121.5), (99, 124), (96.5, 121.5))
        make_face()
    cut_extrude_5_tool2 = extrude(cut_extrude_5_sk2.sketch, amount=-CUT_EXTRUDE_5_REACH, mode=Mode.PRIVATE) & part.part
    # 草图8 → 切除-拉伸5 (cut, up to next)
    with BuildSketch(Plane.XY, mode=Mode.PRIVATE) as cut_extrude_5_sk3:
        with BuildLine():
            Line((-96.5, 18.5), (-96.5, 21.5))
            ThreePointArc((-96.5, 21.5), (-99, 24), (-101.5, 21.5))
            Line((-101.5, 21.5), (-101.5, 18.5))
            ThreePointArc((-101.5, 18.5), (-99, 16), (-96.5, 18.5))
        make_face()
    cut_extrude_5_tool3 = extrude(cut_extrude_5_sk3.sketch, amount=-CUT_EXTRUDE_5_REACH, mode=Mode.PRIVATE) & part.part
    # 草图8 → 切除-拉伸5 (cut, up to next)
    with BuildSketch(Plane.XY, mode=Mode.PRIVATE) as cut_extrude_5_sk4:
        with BuildLine():
            Line((96.5, 18.5), (96.5, 21.5))
            ThreePointArc((96.5, 21.5), (99, 24), (101.5, 21.5))
            Line((101.5, 21.5), (101.5, 18.5))
            ThreePointArc((101.5, 18.5), (99, 16), (96.5, 18.5))
        make_face()
    cut_extrude_5_tool4 = extrude(cut_extrude_5_sk4.sketch, amount=-CUT_EXTRUDE_5_REACH, mode=Mode.PRIVATE) & part.part
    add(cut_extrude_5_tool1.solids().sort_by_distance((-99, 120, 0))[0], mode=Mode.SUBTRACT)
    add(cut_extrude_5_tool2.solids().sort_by_distance((99, 120, 0))[0], mode=Mode.SUBTRACT)
    add(cut_extrude_5_tool3.solids().sort_by_distance((-99, 20, 0))[0], mode=Mode.SUBTRACT)
    add(cut_extrude_5_tool4.solids().sort_by_distance((99, 20, 0))[0], mode=Mode.SUBTRACT)

    # M4 间隙孔1 (through all)
    with Locations(Plane.ZY.offset(131.7)):
        with Locations((-241.5, 128), (-135.5, 20)):
            Hole(HOLE_WIZARD_M4_1_D / 2)


solid = part.part
